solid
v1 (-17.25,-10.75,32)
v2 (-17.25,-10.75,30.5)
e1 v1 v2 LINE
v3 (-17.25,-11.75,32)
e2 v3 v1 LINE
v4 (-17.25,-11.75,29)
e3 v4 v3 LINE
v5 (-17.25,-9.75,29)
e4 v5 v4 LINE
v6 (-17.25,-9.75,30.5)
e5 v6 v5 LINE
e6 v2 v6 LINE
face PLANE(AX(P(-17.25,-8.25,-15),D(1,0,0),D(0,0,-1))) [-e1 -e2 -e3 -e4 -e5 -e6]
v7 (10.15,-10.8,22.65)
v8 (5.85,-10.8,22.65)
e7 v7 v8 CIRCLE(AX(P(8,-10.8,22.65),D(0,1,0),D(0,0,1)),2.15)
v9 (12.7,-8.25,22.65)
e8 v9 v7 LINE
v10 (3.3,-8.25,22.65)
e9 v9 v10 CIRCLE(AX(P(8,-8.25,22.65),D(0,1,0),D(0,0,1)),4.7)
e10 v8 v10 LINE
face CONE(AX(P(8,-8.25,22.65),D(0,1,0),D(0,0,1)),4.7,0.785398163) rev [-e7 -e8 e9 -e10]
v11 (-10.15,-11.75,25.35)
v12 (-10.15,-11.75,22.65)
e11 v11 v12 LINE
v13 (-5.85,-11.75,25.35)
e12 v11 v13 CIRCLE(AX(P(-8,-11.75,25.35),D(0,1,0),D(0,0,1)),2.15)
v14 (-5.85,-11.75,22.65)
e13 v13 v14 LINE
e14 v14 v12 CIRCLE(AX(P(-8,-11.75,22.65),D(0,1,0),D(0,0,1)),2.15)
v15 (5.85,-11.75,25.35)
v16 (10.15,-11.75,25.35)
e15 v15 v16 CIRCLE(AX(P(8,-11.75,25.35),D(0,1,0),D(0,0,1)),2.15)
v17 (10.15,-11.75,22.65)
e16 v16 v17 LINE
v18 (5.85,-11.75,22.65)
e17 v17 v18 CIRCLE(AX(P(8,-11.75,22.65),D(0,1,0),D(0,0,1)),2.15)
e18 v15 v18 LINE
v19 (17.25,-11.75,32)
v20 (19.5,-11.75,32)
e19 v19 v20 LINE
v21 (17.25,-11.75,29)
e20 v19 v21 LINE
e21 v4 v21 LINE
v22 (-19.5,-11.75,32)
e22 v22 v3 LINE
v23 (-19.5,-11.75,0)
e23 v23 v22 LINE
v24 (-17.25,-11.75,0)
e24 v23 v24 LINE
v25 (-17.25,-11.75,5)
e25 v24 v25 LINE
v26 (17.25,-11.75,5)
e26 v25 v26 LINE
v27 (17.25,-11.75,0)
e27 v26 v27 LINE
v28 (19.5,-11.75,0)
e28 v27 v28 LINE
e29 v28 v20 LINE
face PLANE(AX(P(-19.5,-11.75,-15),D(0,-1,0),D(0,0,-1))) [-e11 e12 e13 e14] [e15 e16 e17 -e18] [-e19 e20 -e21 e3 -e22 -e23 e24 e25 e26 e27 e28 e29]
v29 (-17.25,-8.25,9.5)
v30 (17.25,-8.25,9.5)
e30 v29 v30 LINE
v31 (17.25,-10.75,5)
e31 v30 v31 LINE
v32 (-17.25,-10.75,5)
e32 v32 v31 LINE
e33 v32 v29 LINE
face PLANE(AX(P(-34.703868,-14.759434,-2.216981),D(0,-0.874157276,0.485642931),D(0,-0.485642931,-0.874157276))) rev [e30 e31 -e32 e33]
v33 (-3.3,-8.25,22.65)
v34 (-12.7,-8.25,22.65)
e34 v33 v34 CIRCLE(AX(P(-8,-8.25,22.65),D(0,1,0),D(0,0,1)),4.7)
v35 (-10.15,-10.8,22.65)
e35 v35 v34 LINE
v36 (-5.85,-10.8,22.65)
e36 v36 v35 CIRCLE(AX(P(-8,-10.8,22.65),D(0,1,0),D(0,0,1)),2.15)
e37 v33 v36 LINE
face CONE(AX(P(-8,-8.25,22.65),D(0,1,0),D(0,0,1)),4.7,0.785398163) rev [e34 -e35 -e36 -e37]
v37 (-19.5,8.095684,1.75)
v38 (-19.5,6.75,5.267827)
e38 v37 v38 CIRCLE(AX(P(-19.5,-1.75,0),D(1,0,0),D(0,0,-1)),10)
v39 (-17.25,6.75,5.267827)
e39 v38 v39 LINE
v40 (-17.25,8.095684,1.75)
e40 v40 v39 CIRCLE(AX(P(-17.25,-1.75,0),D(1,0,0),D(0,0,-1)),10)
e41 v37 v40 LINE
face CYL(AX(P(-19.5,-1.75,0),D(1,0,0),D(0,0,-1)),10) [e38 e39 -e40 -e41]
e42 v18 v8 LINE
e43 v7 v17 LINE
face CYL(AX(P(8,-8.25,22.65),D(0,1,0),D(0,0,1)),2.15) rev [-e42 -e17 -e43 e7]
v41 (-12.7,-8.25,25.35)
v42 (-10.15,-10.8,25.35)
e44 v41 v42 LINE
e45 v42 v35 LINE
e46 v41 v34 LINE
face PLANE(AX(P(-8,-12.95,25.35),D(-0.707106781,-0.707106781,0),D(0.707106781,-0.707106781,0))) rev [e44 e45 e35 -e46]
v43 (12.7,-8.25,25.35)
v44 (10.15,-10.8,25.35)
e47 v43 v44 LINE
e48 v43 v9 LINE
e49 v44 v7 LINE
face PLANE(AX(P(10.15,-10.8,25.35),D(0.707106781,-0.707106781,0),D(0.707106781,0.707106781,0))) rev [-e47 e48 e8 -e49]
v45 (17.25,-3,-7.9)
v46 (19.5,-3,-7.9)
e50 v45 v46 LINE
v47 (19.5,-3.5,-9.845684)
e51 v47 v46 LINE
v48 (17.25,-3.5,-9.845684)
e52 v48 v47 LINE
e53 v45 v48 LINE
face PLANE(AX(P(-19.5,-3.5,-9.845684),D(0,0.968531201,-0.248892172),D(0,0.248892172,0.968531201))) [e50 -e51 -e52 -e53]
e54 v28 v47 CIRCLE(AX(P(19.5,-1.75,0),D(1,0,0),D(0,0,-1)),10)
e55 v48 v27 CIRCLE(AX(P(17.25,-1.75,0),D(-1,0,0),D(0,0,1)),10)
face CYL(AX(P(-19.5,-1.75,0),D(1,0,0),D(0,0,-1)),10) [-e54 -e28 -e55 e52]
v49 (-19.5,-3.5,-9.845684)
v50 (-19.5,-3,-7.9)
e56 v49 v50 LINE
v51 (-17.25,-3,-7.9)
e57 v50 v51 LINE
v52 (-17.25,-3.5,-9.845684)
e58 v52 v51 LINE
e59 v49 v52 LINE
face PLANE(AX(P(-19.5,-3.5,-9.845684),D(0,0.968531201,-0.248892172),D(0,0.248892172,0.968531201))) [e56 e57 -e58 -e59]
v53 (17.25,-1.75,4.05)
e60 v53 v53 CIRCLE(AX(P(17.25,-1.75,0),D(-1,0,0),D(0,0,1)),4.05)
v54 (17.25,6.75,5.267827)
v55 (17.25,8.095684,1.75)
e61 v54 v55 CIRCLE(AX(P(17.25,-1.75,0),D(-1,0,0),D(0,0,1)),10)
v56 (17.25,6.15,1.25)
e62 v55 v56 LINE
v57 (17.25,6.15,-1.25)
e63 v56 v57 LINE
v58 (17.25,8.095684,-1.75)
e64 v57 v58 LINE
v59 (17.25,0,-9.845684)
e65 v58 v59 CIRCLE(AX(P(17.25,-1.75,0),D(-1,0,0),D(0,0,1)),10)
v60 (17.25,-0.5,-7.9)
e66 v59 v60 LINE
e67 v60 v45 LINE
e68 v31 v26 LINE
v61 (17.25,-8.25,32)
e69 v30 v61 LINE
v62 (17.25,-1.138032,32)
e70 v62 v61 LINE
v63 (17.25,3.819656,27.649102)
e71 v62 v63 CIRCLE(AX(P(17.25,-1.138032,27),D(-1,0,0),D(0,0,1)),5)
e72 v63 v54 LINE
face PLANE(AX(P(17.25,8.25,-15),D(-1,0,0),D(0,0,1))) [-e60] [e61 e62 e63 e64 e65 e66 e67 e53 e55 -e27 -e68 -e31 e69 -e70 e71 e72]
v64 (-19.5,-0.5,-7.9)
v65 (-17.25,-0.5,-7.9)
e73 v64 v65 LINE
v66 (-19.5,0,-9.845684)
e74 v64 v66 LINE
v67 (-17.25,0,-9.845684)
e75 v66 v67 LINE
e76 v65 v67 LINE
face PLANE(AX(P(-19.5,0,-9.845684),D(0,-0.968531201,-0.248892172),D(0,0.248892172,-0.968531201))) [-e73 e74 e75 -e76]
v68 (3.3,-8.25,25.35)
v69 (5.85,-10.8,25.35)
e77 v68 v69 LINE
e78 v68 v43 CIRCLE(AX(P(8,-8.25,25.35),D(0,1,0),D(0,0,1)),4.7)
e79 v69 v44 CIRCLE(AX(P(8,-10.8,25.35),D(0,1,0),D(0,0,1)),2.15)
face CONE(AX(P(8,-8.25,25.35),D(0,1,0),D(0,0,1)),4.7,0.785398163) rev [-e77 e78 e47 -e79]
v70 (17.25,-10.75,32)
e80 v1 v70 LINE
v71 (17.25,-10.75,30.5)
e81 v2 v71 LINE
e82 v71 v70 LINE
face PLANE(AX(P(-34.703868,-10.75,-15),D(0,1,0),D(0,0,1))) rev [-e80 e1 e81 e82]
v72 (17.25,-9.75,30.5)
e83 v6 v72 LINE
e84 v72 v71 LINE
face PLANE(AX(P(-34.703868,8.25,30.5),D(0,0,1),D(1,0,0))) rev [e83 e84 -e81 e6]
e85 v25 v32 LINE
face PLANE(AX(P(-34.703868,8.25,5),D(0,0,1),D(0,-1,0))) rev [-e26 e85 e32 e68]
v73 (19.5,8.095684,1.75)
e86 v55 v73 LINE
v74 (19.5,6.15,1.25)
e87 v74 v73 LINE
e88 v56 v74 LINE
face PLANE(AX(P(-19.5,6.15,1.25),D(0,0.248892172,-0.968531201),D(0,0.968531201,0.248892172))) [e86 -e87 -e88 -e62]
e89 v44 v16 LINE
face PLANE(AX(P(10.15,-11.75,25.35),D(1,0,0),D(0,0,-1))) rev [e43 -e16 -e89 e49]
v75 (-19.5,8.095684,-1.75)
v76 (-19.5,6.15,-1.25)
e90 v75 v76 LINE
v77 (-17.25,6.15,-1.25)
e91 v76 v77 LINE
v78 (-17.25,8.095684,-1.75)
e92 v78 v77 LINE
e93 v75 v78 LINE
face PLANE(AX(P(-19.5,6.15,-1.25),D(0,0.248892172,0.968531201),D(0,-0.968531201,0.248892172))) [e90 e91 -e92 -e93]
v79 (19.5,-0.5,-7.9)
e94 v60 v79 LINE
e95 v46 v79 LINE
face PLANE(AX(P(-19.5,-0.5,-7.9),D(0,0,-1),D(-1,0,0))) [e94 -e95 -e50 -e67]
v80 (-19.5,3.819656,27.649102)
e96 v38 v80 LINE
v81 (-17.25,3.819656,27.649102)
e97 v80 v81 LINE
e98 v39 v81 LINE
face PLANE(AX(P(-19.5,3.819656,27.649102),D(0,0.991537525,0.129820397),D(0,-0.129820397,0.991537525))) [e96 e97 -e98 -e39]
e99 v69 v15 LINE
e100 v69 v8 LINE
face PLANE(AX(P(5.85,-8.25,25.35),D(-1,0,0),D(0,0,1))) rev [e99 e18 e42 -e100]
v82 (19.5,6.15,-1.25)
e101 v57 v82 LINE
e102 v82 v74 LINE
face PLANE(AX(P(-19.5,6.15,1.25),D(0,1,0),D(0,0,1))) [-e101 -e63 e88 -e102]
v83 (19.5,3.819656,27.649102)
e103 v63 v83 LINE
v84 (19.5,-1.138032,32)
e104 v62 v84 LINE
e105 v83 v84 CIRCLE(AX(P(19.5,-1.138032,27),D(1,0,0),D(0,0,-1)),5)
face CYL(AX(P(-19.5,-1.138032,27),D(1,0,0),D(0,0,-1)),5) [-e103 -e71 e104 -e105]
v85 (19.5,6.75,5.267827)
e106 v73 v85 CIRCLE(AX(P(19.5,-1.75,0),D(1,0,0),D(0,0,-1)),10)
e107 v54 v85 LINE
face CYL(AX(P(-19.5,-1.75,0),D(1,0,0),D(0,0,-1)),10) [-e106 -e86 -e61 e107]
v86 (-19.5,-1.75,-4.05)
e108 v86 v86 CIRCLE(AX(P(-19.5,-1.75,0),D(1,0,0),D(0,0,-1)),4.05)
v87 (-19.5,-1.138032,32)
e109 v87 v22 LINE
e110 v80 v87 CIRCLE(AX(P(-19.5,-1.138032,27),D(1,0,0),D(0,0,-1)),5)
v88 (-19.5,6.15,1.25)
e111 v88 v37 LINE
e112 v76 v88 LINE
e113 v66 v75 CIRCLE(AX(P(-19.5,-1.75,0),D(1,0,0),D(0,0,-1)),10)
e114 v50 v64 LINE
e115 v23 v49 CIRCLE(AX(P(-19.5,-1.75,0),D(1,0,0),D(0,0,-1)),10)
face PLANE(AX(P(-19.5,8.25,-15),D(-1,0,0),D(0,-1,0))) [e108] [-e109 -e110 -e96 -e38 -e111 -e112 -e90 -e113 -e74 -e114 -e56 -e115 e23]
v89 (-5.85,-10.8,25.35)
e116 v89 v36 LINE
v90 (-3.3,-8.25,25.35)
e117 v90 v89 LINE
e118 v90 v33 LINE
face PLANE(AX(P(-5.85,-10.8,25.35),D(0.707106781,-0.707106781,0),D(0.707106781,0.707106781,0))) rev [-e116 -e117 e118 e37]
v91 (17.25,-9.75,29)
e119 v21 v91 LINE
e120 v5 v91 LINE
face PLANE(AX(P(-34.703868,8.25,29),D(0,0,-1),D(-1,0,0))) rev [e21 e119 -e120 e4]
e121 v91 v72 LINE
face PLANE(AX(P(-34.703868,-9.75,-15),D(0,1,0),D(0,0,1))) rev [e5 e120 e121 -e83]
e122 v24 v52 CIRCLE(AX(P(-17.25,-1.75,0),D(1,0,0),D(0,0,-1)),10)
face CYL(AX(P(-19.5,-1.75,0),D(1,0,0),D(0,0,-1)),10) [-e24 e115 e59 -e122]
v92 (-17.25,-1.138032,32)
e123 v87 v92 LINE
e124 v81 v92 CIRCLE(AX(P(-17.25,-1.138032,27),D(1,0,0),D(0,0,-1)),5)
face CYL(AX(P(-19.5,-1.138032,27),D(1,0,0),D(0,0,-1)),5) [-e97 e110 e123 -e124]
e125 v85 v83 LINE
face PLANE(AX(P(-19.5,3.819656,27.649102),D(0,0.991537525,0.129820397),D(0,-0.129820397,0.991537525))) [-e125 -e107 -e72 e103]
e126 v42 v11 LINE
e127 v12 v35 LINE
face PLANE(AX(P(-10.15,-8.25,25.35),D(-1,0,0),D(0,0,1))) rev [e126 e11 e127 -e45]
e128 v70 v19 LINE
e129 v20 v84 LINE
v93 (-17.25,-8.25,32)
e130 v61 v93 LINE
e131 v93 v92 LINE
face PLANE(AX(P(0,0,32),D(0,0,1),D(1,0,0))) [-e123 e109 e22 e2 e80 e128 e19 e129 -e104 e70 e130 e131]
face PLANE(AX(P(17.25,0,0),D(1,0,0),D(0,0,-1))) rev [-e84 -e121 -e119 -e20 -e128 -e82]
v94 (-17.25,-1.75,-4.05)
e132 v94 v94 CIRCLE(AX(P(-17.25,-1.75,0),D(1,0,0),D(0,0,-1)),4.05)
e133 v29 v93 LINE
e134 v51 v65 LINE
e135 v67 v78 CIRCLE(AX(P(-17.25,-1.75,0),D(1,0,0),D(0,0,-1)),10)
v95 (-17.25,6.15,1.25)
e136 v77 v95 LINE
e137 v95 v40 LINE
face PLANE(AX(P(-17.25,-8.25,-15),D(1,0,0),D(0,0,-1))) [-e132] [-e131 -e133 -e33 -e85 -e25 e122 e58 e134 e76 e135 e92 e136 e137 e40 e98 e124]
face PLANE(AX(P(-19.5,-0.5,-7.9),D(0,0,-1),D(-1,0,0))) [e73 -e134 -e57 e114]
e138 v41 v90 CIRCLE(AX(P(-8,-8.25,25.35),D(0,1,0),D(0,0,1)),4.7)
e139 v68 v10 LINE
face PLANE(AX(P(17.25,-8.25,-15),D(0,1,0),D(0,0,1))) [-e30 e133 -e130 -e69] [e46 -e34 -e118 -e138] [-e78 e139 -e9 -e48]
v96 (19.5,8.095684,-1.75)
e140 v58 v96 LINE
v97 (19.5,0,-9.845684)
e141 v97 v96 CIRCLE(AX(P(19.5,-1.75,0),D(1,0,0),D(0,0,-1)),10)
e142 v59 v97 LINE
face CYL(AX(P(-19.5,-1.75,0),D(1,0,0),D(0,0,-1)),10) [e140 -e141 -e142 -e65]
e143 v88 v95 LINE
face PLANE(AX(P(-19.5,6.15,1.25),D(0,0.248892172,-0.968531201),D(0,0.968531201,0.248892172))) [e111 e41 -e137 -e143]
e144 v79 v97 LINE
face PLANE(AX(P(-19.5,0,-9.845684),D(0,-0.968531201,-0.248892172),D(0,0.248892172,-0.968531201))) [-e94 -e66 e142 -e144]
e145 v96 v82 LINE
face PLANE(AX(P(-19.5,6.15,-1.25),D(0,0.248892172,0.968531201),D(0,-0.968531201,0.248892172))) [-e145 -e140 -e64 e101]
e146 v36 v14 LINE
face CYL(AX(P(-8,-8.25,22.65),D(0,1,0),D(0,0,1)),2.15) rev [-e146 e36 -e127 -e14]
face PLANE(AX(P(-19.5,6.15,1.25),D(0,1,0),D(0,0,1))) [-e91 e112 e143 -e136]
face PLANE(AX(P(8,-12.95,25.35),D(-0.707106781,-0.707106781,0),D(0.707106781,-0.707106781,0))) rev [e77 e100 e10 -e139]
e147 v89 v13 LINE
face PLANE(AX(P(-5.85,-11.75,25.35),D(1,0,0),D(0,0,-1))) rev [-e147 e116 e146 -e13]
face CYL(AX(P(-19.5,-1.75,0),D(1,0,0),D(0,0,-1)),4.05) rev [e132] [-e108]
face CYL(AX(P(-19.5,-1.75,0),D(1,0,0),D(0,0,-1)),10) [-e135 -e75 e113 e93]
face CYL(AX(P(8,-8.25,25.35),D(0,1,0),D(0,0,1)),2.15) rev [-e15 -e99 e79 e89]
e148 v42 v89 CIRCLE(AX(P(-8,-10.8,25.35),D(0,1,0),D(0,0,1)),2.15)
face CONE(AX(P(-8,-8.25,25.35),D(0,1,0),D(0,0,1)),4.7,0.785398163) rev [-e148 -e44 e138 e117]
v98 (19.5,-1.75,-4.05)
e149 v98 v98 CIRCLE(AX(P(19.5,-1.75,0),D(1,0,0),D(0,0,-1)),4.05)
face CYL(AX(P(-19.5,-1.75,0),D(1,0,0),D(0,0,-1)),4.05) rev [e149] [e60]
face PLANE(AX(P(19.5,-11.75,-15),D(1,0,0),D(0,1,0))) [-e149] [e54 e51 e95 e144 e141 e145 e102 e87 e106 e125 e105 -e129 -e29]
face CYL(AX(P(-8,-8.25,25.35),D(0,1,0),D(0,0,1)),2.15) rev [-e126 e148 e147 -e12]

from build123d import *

# Parameters (mm, degrees)
BODY_DEPTH                                      = 32
BODY_DEPTH_BACK                                 = 15
PIVOT_HOLE_DEPTH                                = 40.272286666
PIVOT_HOLE_DEPTH_BACK                           = 40.272286666
PIVOT_HOLE_SKETCH_R                             = 4.05
OUTSIDE_SHAPE_CUT_OUT_DEPTH                     = 40.272286666
OUTSIDE_SHAPE_CUT_OUT_DEPTH_BACK                = 40.272286666
OUTSIDE_SHAPE_CUT_OUT_SKETCH_W                  = 49
OUTSIDE_SHAPE_CUT_OUT_SKETCH_H                  = 22
INSIDE_START                                    = 17.25
INSIDE_SHAPE_CUT_OUT_DEPTH                      = 34.5
F_2_START                                       = -11.75
F_2_LATERAL_SLOTS_ORIENTED_LONGITUDINALLY_DEPTH = 3.5


with BuildPart() as part:
    # Profile Sketch → Body (new, two sides: drawn at the far end of the back side and taken through both)
    with BuildSketch(Plane.XY.offset(-BODY_DEPTH_BACK)):
        Polygon((-19.5, -11.75), (19.5, -11.75), (19.5, 8.25), (17.25, 8.25), (17.25, -8.25), (-17.25, -8.25), (-17.25, 8.25), (-19.5, 8.25), align=None)
    extrude(amount=BODY_DEPTH + BODY_DEPTH_BACK)

    # Pivot Hole Sketch → Pivot Hole (cut, two sides: drawn at the far end of the back side and taken through both)
    with BuildSketch(Plane(origin=(0, 0, 0), x_dir=(0, 0, -1), z_dir=(1, 0, 0)).offset(-PIVOT_HOLE_DEPTH_BACK)):
        with Locations((0, -1.75)):
            Circle(PIVOT_HOLE_SKETCH_R)
    extrude(amount=PIVOT_HOLE_DEPTH + PIVOT_HOLE_DEPTH_BACK, mode=Mode.SUBTRACT)

    # Outside Shape Cut Out Sketch → Outside Shape Cut Out (cut, two sides: drawn at the far end of the back side and taken through both)
    with BuildSketch(Plane(origin=(0, 0, 0), x_dir=(0, 0, -1), z_dir=(1, 0, 0)).offset(-OUTSIDE_SHAPE_CUT_OUT_DEPTH_BACK)):
        with Locations((-9.5, -2.75)):
            Rectangle(OUTSIDE_SHAPE_CUT_OUT_SKETCH_W, OUTSIDE_SHAPE_CUT_OUT_SKETCH_H)
        with BuildLine():
            Line((-27.649101987, 3.819656009), (-5.267826876, 6.75))
            ThreePointArc((-5.267826876, 6.75), (-3.57284062, 7.589957703), (-1.75, 8.095684334))
            Line((-1.75, 8.095684334), (-1.25, 6.15))
            Line((-1.25, 6.15), (1.25, 6.15))
            Line((1.25, 6.15), (1.75, 8.095684334))
            ThreePointArc((1.75, 8.095684334), (7.071067812, 5.321067812), (9.845684334, 0))
            Line((9.845684334, 0), (7.9, -0.5))
            Line((7.9, -0.5), (7.9, -3))
            Line((7.9, -3), (9.845684334, -3.5))
            ThreePointArc((9.845684334, -3.5), (6.422616289, -9.414854858), (0, -11.75))
            Line((0, -11.75), (-32, -11.75))
            Line((-32, -11.75), (-32, -1.138031619))
            ThreePointArc((-32, -1.138031619), (-30.758025408, 2.160035244), (-27.649101987, 3.819656009))
        make_face(mode=Mode.SUBTRACT)
    extrude(amount=OUTSIDE_SHAPE_CUT_OUT_DEPTH + OUTSIDE_SHAPE_CUT_OUT_DEPTH_BACK, mode=Mode.SUBTRACT)

    # Inside Shape Cut Out Sketch → Inside Shape Cut Out (cut)
    with BuildSketch(Plane(origin=(0, 0, 0), x_dir=(0, 0, -1), z_dir=(1, 0, 0)).offset(INSIDE_START)):
        Polygon((-29, -9.75), (-29, -11.75), (-32, -11.75), (-32, -10.75), (-30.5, -10.75), (-30.5, -9.75), align=None)
        Polygon((-9.5, -8.25), (-5, -10.75), (-5, -11.75), (7.599342077, -11.75), (7.599342077, -8.25), align=None)
    extrude(amount=-INSIDE_SHAPE_CUT_OUT_DEPTH, mode=Mode.SUBTRACT)

    # 2 Lateral Slots Oriented Longitudinally: read off the stored shape, not the designer's step
    # 2 Lateral Slots Oriented Longitudina 2 → 2 Lateral Slots Oriented Longitudinally (cut)
    with BuildSketch(Plane(origin=(0, 0, 0), x_dir=(1, 0, 0), z_dir=(0, 1, 0)).offset(F_2_START)):
        with BuildLine():
            Line((10.15, -25.35), (10.15, -22.65))
            ThreePointArc((10.15, -22.65), (8, -20.5), (5.85, -22.65))
            Line((5.85, -22.65), (5.85, -25.35))
            ThreePointArc((5.85, -25.35), (8, -27.5), (10.15, -25.35))
        make_face()
        with BuildLine():
            Line((-5.85, -25.35), (-5.85, -22.65))
            ThreePointArc((-5.85, -22.65), (-8, -20.5), (-10.15, -22.65))
            Line((-10.15, -22.65), (-10.15, -25.35))
            ThreePointArc((-10.15, -25.35), (-8, -27.5), (-5.85, -25.35))
        make_face()
    extrude(amount=F_2_LATERAL_SLOTS_ORIENTED_LONGITUDINALLY_DEPTH, mode=Mode.SUBTRACT)

    # 2 Lateral Slots Oriented Longitudina 3: loft between two sections, ruled curve by curve
    f_2_lateral_slots_oriented_longitudina_3_from = [
        Edge.make_three_point_arc((10.15, -10.8, 22.65), (9.52027958, -10.8, 21.12972042), (8, -10.8, 20.5)),
        Edge.make_three_point_arc((8, -10.8, 20.5), (6.47972042, -10.8, 21.12972042), (5.85, -10.8, 22.65)),
        Edge.make_three_point_arc((5.85, -10.8, 25.35), (6.47972042, -10.8, 26.87027958), (8, -10.8, 27.5)),
        Edge.make_three_point_arc((8, -10.8, 27.5), (9.52027958, -10.8, 26.87027958), (10.15, -10.8, 25.35)),
        Edge.make_line((5.85, -10.8, 22.65), (5.85, -10.8, 25.35)),
        Edge.make_line((10.15, -10.8, 22.65), (10.15, -10.8, 25.35)),
    ]
    f_2_lateral_slots_oriented_longitudina_3_to = [
        Edge.make_three_point_arc((12.7, -8.25, 22.65), (11.323401872, -8.25, 19.326598128), (8, -8.25, 17.95)),
        Edge.make_three_point_arc((8, -8.25, 17.95), (4.676598128, -8.25, 19.326598128), (3.3, -8.25, 22.65)),
        Edge.make_three_point_arc((3.3, -8.25, 25.35), (4.676598128, -8.25, 28.673401872), (8, -8.25, 30.05)),
        Edge.make_three_point_arc((8, -8.25, 30.05), (11.323401872, -8.25, 28.673401872), (12.7, -8.25, 25.35)),
        Edge.make_line((3.3, -8.25, 22.65), (3.3, -8.25, 25.35)),
        Edge.make_line((12.7, -8.25, 22.65), (12.7, -8.25, 25.35)),
    ]
    f_2_lateral_slots_oriented_longitudina_3 = Solid(Shell([*[Face.make_surface_from_curves(f_2_lateral_slots_oriented_longitudina_3_from[k], f_2_lateral_slots_oriented_longitudina_3_to[k]) for k in range(6)], Face(Wire(f_2_lateral_slots_oriented_longitudina_3_from)), Face(Wire(f_2_lateral_slots_oriented_longitudina_3_to))]))
    add(f_2_lateral_slots_oriented_longitudina_3, mode=Mode.SUBTRACT)

    # 2 Lateral Slots Oriented Longitudina 4: loft between two sections, ruled curve by curve
    f_2_lateral_slots_oriented_longitudina_4_from = [
        Edge.make_three_point_arc((-5.85, -10.8, 22.65), (-6.47972042, -10.8, 21.12972042), (-8, -10.8, 20.5)),
        Edge.make_three_point_arc((-8, -10.8, 20.5), (-9.52027958, -10.8, 21.12972042), (-10.15, -10.8, 22.65)),
        Edge.make_three_point_arc((-10.15, -10.8, 25.35), (-9.52027958, -10.8, 26.87027958), (-8, -10.8, 27.5)),
        Edge.make_three_point_arc((-8, -10.8, 27.5), (-6.47972042, -10.8, 26.87027958), (-5.85, -10.8, 25.35)),
        Edge.make_line((-10.15, -10.8, 22.65), (-10.15, -10.8, 25.35)),
        Edge.make_line((-5.85, -10.8, 22.65), (-5.85, -10.8, 25.35)),
    ]
    f_2_lateral_slots_oriented_longitudina_4_to = [
        Edge.make_three_point_arc((-3.3, -8.25, 22.65), (-4.676598128, -8.25, 19.326598128), (-8, -8.25, 17.95)),
        Edge.make_three_point_arc((-8, -8.25, 17.95), (-11.323401872, -8.25, 19.326598128), (-12.7, -8.25, 22.65)),
        Edge.make_three_point_arc((-12.7, -8.25, 25.35), (-11.323401872, -8.25, 28.673401872), (-8, -8.25, 30.05)),
        Edge.make_three_point_arc((-8, -8.25, 30.05), (-4.676598128, -8.25, 28.673401872), (-3.3, -8.25, 25.35)),
        Edge.make_line((-12.7, -8.25, 22.65), (-12.7, -8.25, 25.35)),
        Edge.make_line((-3.3, -8.25, 22.65), (-3.3, -8.25, 25.35)),
    ]
    f_2_lateral_slots_oriented_longitudina_4 = Solid(Shell([*[Face.make_surface_from_curves(f_2_lateral_slots_oriented_longitudina_4_from[k], f_2_lateral_slots_oriented_longitudina_4_to[k]) for k in range(6)], Face(Wire(f_2_lateral_slots_oriented_longitudina_4_from)), Face(Wire(f_2_lateral_slots_oriented_longitudina_4_to))]))
    add(f_2_lateral_slots_oriented_longitudina_4, mode=Mode.SUBTRACT)


solid = part.part
